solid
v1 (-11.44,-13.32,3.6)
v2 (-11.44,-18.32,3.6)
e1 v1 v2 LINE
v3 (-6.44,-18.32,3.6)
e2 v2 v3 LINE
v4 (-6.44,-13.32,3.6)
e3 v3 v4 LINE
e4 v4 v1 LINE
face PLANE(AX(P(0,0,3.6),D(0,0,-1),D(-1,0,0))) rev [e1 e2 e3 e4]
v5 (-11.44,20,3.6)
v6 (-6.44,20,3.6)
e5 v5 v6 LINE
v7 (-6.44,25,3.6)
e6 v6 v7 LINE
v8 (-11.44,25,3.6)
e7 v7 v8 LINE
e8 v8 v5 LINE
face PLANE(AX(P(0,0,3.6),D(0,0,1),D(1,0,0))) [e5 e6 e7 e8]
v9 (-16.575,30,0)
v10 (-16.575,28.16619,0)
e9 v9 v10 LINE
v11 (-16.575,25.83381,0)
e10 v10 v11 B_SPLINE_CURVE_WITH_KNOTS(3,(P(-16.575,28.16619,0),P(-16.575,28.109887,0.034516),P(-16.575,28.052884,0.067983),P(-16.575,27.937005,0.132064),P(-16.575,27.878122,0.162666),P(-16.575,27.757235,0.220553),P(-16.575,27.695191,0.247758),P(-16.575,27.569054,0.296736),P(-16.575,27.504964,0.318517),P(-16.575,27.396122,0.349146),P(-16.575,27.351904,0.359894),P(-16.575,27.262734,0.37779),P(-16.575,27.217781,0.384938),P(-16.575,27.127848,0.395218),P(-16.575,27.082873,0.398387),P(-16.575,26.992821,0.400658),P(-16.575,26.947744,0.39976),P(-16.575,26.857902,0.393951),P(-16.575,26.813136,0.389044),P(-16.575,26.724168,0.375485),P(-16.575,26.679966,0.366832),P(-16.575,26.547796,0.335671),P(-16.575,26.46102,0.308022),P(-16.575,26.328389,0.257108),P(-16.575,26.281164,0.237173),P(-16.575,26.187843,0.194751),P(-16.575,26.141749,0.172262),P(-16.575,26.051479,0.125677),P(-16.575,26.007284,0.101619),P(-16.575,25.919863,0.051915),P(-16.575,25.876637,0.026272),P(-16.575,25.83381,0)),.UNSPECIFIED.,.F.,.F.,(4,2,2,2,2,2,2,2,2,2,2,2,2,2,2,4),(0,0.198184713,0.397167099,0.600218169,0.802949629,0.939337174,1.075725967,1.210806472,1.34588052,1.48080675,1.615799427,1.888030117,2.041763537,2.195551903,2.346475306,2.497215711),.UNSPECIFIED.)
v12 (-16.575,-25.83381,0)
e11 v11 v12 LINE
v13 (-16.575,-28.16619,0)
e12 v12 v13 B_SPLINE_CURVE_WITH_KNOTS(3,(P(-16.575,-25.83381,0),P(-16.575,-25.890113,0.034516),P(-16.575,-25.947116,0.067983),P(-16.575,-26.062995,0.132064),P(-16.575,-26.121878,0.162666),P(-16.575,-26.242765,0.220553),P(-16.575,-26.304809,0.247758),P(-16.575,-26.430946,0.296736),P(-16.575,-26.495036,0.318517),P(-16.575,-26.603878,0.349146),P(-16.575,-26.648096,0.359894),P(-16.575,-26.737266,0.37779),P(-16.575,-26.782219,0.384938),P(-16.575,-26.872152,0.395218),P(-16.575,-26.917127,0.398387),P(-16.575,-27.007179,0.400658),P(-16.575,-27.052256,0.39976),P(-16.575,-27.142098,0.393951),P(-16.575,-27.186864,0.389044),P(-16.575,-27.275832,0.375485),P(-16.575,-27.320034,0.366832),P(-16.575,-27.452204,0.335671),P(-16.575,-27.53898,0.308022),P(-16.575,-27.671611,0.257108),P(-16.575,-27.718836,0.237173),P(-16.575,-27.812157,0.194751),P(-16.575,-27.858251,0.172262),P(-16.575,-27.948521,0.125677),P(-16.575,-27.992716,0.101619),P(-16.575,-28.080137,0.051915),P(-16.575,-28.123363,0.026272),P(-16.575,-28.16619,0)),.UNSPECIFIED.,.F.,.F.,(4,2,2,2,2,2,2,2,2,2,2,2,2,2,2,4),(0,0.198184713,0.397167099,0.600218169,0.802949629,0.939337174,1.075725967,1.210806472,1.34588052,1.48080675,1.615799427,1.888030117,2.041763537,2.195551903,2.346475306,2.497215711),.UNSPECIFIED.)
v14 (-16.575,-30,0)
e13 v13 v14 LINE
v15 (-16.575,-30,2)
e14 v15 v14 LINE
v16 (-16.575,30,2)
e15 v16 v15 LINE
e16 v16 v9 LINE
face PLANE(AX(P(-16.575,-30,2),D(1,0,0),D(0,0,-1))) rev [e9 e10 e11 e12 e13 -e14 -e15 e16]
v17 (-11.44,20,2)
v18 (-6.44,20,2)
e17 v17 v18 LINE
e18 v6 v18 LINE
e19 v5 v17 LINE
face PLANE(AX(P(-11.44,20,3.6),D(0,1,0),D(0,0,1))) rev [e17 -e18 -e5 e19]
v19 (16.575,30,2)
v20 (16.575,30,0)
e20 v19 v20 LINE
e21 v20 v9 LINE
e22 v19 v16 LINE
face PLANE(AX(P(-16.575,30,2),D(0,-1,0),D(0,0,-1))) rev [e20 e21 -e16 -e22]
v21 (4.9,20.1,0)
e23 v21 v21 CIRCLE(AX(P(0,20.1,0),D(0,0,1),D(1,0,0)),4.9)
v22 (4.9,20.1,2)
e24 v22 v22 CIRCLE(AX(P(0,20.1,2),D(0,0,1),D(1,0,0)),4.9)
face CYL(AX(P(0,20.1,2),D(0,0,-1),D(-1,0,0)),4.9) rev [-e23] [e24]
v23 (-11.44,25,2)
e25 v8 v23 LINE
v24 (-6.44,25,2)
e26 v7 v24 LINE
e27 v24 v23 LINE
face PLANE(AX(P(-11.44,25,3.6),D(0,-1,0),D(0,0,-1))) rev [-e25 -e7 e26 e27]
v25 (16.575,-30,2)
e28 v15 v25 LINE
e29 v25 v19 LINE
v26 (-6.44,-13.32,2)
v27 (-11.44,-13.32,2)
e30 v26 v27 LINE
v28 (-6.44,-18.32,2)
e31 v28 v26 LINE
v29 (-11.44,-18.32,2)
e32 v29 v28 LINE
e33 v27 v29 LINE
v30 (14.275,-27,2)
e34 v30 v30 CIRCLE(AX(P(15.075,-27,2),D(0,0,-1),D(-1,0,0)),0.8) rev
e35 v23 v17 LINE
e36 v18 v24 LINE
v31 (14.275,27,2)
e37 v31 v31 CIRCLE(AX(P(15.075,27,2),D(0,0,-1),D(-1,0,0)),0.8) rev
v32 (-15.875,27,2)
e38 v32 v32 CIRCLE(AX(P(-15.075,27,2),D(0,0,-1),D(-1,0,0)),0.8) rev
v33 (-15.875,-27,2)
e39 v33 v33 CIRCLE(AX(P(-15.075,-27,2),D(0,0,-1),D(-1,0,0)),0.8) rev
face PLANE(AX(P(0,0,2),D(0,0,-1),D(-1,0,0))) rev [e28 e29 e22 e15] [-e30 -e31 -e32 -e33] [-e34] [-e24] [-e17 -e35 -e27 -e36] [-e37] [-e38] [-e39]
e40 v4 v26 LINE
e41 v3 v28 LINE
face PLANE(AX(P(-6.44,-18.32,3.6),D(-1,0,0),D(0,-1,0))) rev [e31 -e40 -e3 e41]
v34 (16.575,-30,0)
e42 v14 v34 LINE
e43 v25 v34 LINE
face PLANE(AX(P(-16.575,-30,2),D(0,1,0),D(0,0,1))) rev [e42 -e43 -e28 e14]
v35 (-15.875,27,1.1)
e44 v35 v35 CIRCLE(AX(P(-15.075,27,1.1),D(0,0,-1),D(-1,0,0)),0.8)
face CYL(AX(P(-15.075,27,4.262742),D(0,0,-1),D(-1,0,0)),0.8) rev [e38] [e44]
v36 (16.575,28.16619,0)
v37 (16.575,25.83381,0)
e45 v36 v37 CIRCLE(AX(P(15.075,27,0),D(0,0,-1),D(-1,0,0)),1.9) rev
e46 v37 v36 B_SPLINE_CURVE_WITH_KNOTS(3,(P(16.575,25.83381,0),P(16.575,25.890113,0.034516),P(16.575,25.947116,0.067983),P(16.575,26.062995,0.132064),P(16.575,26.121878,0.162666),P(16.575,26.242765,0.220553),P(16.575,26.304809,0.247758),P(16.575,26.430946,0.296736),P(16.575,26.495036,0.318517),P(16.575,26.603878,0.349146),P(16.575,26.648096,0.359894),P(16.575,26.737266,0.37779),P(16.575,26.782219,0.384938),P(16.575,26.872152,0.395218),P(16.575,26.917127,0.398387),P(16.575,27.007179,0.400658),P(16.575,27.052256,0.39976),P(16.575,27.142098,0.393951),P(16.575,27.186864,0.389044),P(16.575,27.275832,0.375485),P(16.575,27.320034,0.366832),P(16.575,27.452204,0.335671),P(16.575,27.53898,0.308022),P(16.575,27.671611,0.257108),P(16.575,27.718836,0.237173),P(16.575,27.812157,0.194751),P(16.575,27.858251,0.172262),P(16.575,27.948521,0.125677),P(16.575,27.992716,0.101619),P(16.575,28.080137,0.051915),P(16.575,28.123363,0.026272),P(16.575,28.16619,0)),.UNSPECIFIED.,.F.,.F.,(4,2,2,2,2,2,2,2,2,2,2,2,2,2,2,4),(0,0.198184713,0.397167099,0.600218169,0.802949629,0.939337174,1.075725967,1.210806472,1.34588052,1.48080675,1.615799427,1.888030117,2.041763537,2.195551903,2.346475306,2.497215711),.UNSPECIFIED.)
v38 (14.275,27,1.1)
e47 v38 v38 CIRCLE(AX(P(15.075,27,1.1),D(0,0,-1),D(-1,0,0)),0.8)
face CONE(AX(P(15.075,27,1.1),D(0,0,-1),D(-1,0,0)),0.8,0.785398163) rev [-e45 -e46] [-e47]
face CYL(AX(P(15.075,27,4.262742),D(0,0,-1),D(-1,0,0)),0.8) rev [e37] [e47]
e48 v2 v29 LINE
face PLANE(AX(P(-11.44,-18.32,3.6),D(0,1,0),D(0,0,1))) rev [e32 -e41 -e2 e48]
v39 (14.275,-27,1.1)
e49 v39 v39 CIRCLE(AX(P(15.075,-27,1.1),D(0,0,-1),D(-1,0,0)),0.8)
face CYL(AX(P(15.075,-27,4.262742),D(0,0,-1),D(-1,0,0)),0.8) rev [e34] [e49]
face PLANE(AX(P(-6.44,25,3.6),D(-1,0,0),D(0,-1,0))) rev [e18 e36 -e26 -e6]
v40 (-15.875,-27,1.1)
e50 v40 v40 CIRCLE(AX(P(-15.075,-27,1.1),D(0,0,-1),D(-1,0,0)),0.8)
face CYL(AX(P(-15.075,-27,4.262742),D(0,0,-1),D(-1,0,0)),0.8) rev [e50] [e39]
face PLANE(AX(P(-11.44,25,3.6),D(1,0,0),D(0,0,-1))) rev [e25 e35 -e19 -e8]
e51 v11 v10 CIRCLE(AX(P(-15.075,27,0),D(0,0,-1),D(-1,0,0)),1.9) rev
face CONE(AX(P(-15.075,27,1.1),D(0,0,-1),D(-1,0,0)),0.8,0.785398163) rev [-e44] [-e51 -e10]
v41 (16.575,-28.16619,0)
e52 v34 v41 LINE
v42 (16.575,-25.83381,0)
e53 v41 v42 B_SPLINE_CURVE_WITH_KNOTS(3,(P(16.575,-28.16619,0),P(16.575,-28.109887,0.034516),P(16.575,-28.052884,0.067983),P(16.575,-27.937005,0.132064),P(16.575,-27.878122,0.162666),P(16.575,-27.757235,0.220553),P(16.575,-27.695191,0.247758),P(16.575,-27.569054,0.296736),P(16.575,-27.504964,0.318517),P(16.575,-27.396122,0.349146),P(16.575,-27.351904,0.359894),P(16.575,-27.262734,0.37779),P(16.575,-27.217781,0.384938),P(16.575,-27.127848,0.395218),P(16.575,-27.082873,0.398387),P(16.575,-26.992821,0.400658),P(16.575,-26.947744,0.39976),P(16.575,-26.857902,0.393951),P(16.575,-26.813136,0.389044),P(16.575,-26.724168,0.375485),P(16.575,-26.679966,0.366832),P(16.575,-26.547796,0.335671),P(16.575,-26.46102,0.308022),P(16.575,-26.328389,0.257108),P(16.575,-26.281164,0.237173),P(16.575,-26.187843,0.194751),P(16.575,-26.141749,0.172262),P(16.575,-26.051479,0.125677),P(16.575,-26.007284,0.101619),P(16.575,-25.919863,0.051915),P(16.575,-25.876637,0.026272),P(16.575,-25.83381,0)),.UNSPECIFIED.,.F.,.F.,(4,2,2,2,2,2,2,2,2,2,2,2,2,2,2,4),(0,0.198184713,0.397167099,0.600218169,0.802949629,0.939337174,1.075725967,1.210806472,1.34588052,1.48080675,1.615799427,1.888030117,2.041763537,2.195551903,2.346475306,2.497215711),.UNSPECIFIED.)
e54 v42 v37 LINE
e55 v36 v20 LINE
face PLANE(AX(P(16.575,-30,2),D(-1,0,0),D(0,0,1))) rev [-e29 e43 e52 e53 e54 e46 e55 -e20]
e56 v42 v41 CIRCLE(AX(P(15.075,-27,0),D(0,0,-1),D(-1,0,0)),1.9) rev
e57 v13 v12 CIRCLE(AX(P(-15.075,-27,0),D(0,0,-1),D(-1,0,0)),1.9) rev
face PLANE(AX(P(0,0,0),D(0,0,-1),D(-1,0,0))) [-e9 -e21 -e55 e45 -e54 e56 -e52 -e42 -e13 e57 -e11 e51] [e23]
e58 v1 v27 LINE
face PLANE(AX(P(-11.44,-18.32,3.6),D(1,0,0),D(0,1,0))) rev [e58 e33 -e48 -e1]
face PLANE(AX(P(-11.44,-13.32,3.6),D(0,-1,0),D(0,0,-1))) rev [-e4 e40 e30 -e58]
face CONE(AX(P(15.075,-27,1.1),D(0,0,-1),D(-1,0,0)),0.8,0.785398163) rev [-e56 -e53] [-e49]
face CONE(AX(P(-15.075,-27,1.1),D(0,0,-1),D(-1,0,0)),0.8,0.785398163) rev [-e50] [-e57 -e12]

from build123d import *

# Parameters (mm, degrees)
SKETCH1_W           = 33.15
SKETCH1_H           = 60
SKETCH1_R           = 4.9
BOSS_EXTRUDE1_DEPTH = 2
SKETCH3_W           = 5
SKETCH3_H           = 5
BOSS_EXTRUDE2_DEPTH = 1.6
SKETCH4_R           = 0.8
CUT_EXTRUDE1_DEPTH  = 2
CHAMFER1_SIZE       = 1.1


with BuildPart() as part:
    # Sketch1 → Boss-Extrude1 (new body)
    with BuildSketch(Plane.XY):
        Rectangle(SKETCH1_W, SKETCH1_H)
        with Locations((0, 20.1)):
            Circle(SKETCH1_R, mode=Mode.SUBTRACT)
    extrude(amount=BOSS_EXTRUDE1_DEPTH)

    # Sketch3 → Boss-Extrude2 (add)
    with BuildSketch(Plane.XY.offset(2)):
        with Locations((-8.94, 22.5)):
            Rectangle(SKETCH3_W, SKETCH3_H)
        with Locations((-8.94, -15.82)):
            Rectangle(SKETCH3_W, SKETCH3_H)
    extrude(amount=BOSS_EXTRUDE2_DEPTH)

    # Sketch4 → Cut-Extrude1 (cut)
    with BuildSketch(Plane(origin=(0, 0, 0), x_dir=(-1, 0, 0), z_dir=(0, 0, -1))):
        with Locations((-15.075, 27)):
            Circle(SKETCH4_R)
        with Locations((15.075, 27)):
            Circle(SKETCH4_R)
        with Locations((15.075, -27)):
            Circle(SKETCH4_R)
        with Locations((-15.075, -27)):
            Circle(SKETCH4_R)
    extrude(amount=-CUT_EXTRUDE1_DEPTH, mode=Mode.SUBTRACT)

    # Chamfer1
    # the kernel refuses this chamfer: 1.1 mm, written as the material it takes off along each edge
    with BuildSketch(Plane(origin=(15.075, -27, 0), x_dir=(-1, 0, 0), z_dir=(0, -1, 0))) as chamfer1_piece_1:
        Polygon((0.8 + CHAMFER1_SIZE, 0), (0.8, -CHAMFER1_SIZE), (0.8, 0), align=None)
    revolve(axis=Axis((15.075, -27, 0), (0, 0, -1)), mode=Mode.SUBTRACT)
    with BuildSketch(Plane(origin=(-15.075, -27, 0), x_dir=(-1, 0, 0), z_dir=(0, -1, 0))) as chamfer1_piece_2:
        Polygon((0.8 + CHAMFER1_SIZE, 0), (0.8, -CHAMFER1_SIZE), (0.8, 0), align=None)
    revolve(axis=Axis((-15.075, -27, 0), (0, 0, -1)), mode=Mode.SUBTRACT)
    with BuildSketch(Plane(origin=(-15.075, 27, 0), x_dir=(-1, 0, 0), z_dir=(0, -1, 0))) as chamfer1_piece_3:
        Polygon((0.8 + CHAMFER1_SIZE, 0), (0.8, -CHAMFER1_SIZE), (0.8, 0), align=None)
    revolve(axis=Axis((-15.075, 27, 0), (0, 0, -1)), mode=Mode.SUBTRACT)
    with BuildSketch(Plane(origin=(15.075, 27, 0), x_dir=(-1, 0, 0), z_dir=(0, -1, 0))) as chamfer1_piece_4:
        Polygon((0.8 + CHAMFER1_SIZE, 0), (0.8, -CHAMFER1_SIZE), (0.8, 0), align=None)
    revolve(axis=Axis((15.075, 27, 0), (0, 0, -1)), mode=Mode.SUBTRACT)


solid = part.part
